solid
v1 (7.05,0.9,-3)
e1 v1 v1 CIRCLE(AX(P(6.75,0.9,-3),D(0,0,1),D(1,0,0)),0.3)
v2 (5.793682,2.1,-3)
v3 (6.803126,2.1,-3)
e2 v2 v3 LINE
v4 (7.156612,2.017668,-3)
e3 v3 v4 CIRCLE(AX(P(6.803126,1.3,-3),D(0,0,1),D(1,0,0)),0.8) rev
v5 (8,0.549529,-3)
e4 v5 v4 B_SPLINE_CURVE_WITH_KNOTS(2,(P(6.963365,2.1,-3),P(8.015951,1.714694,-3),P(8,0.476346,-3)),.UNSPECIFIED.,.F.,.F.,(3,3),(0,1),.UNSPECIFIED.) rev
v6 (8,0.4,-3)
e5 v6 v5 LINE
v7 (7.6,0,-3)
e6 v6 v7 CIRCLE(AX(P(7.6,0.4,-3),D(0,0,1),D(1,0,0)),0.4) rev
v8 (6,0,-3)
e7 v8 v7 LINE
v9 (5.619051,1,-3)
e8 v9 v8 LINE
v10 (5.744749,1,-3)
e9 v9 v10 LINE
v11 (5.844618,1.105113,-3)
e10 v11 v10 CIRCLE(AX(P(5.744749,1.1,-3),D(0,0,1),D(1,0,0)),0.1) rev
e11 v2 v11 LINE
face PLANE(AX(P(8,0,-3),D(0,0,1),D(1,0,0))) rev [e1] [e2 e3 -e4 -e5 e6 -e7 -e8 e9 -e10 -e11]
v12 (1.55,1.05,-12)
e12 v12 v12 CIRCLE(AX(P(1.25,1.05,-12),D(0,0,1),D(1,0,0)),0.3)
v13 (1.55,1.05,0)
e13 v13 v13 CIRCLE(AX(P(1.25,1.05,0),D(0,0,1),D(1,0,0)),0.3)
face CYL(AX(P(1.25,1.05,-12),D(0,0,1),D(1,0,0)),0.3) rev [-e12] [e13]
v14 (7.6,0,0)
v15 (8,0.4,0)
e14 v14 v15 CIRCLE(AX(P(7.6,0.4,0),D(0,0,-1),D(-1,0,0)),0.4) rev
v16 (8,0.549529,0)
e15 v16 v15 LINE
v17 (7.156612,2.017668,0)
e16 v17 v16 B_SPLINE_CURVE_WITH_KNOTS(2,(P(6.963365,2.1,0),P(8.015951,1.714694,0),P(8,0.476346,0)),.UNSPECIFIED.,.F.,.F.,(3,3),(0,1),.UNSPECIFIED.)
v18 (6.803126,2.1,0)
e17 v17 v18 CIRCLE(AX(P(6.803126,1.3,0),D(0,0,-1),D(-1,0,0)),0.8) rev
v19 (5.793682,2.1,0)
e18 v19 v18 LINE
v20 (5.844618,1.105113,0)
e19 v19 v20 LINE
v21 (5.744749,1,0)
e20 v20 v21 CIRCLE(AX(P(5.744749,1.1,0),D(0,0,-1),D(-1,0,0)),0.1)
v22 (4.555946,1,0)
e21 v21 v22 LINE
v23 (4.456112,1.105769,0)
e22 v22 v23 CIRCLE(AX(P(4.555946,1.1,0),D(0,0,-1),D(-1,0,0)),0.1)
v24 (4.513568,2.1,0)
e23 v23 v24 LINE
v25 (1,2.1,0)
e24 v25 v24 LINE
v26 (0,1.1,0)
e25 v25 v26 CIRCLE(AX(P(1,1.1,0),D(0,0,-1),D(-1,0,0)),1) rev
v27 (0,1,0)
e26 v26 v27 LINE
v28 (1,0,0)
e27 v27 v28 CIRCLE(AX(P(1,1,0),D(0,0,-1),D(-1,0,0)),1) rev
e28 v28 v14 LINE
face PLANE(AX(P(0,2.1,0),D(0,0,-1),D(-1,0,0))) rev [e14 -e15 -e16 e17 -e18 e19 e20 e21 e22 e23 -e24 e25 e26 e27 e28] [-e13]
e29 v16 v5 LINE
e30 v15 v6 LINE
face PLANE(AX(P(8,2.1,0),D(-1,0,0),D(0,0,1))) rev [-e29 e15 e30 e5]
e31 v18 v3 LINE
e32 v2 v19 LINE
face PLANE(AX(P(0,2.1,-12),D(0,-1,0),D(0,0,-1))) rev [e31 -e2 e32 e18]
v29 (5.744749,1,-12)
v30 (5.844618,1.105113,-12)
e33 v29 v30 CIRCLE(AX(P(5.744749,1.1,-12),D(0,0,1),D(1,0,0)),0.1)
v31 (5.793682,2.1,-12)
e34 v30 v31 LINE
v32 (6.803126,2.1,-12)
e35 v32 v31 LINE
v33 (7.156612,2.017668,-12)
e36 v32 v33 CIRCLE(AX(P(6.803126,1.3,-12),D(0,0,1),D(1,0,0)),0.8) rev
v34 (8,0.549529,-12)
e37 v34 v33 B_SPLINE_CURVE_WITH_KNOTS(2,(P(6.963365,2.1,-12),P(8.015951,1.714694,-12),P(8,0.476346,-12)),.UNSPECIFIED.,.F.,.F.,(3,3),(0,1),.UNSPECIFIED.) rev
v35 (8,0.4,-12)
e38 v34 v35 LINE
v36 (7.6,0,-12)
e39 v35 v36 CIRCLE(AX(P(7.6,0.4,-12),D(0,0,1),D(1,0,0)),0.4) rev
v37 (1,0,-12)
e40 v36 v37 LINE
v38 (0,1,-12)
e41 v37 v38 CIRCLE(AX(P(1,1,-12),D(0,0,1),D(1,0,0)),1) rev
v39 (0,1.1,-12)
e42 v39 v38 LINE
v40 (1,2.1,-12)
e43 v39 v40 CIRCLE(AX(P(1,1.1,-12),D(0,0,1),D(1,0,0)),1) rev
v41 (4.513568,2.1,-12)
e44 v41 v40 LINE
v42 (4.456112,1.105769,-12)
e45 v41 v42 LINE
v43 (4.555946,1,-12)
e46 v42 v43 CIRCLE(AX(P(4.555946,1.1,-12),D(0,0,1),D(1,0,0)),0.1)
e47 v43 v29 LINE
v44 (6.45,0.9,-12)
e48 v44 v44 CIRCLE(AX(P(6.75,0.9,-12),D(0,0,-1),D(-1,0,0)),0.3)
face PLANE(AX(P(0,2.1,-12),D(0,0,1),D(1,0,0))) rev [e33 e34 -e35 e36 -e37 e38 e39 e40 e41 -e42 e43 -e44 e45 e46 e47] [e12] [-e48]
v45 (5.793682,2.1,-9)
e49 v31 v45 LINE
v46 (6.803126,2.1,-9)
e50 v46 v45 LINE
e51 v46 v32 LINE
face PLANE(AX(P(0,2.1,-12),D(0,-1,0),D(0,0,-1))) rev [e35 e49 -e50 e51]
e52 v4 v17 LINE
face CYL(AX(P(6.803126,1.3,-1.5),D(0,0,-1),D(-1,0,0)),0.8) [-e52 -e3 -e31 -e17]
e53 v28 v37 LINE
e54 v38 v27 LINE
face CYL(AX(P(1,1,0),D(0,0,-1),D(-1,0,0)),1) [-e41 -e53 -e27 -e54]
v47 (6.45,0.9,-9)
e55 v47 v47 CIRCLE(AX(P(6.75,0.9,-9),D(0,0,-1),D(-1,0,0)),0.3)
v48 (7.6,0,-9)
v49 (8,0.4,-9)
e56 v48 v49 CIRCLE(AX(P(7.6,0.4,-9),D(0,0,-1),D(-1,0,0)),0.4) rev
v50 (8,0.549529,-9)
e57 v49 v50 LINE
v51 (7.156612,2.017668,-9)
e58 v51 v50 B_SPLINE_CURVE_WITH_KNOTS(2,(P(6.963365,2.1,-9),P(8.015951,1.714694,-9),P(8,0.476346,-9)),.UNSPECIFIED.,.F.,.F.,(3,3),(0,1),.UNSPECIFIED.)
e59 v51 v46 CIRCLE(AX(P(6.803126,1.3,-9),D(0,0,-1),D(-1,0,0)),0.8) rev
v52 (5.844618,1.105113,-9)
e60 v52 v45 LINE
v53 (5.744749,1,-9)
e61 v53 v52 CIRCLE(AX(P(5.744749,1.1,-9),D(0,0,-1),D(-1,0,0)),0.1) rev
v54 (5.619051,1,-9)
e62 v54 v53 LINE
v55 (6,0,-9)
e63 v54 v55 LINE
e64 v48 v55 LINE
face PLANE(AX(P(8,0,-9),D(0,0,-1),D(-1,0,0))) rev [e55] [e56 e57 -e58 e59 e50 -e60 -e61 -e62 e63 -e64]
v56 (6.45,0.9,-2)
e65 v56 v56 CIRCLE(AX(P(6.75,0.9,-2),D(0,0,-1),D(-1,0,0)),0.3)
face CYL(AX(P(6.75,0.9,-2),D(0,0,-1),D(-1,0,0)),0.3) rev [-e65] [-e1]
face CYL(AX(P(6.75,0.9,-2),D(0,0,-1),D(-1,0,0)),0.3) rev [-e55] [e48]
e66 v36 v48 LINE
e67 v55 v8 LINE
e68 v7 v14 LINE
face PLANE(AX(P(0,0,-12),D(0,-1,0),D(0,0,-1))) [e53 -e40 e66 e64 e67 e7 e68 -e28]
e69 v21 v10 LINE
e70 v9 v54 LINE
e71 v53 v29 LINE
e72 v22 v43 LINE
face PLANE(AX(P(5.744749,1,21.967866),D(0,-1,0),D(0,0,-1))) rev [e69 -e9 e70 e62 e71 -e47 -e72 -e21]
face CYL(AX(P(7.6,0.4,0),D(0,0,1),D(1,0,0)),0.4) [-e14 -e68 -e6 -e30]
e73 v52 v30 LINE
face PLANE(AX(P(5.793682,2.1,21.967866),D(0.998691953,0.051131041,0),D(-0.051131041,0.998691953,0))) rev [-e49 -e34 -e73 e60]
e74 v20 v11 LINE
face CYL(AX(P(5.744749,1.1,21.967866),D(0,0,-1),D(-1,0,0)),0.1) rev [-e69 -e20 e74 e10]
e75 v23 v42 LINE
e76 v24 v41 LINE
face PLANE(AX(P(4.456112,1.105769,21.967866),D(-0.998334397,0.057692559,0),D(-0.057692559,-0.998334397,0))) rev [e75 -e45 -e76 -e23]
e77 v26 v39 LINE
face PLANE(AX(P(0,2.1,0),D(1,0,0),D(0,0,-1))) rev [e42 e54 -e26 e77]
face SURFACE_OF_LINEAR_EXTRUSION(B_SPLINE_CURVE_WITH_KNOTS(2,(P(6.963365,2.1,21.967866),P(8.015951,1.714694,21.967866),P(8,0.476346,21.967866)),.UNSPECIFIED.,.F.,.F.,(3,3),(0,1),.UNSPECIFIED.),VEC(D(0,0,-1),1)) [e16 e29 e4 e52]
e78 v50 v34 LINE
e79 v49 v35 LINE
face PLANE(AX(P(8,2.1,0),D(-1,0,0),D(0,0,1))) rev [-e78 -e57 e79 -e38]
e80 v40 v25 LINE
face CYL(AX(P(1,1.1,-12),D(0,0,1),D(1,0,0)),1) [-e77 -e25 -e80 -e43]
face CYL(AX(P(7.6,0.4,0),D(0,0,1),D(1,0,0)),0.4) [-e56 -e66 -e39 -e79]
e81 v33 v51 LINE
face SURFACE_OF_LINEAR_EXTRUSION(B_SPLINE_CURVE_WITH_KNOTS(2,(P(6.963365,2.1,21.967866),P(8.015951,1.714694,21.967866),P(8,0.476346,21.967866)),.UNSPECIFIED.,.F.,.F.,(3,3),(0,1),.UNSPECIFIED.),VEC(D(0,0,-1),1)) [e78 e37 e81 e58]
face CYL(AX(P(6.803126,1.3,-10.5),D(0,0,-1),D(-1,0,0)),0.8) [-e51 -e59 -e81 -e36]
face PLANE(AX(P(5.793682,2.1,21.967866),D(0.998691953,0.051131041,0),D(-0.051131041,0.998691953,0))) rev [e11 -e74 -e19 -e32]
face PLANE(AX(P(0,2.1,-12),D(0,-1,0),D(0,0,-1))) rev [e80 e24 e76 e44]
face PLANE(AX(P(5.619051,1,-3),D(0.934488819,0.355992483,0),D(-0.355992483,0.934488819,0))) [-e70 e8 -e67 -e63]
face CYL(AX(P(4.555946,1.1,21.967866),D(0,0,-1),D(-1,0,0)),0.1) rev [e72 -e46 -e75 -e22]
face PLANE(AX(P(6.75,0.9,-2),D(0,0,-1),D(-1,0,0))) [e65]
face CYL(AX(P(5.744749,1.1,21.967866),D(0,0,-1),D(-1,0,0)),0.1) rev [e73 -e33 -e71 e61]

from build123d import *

# Parameters (mm, degrees)
SKETCH1_W                = 8
SKETCH1_H                = 12
BOSS_EXTRUDE1_DEPTH      = 2.1
SKETCH2_W                = 2
SKETCH2_H                = 6
CUT_EXTRUDE1_DEPTH       = 2.1
CUT_EXTRUDE4_START       = -12
CUT_EXTRUDE4_DEPTH       = 12
SKETCH4_W                = 6
SKETCH4_H                = 1.1
CUT_EXTRUDE5_DEPTH       = 0.5
CUT_EXTRUDE14_DEPTH      = 6
FILLET1_R                = 1
FILLET2_R                = 0.4
CUT_EXTRUDE15_DEPTH      = 15.574292436
CUT_EXTRUDE15_DEPTH_BACK = 15.574292436
SKETCH8_R                = 0.3
CUT_EXTRUDE16_DEPTH      = 15.574292587
SKETCH9_R                = 0.3
CUT_EXTRUDE17_DEPTH      = 10
FILLET4_R                = 0.8


# Read off the part's stored shape, not the designer's step: Cut-Extrude4
with BuildPart() as part:
    # Sketch1 → Boss-Extrude1 (new body)
    with BuildSketch(Plane(origin=(0, 0, 0), x_dir=(1, 0, 0), z_dir=(0, 1, 0))):
        with Locations((4, 6)):
            Rectangle(SKETCH1_W, SKETCH1_H)
    extrude(amount=BOSS_EXTRUDE1_DEPTH)

    # Sketch2 → Cut-Extrude1 (cut)
    with BuildSketch(Plane(origin=(0, 2.1, 0), x_dir=(1, 0, 0), z_dir=(0, 1, 0))):
        with Locations((7, 6)):
            Rectangle(SKETCH2_W, SKETCH2_H)
    extrude(amount=-CUT_EXTRUDE1_DEPTH, mode=Mode.SUBTRACT)

    # Cut-Extrude4 outline → Cut-Extrude4 (cut)
    with BuildSketch(Plane.XY.offset(CUT_EXTRUDE4_START)):
        with BuildLine():
            ThreePointArc((5.744749223, 1), (5.817245121, 1.031120796), (5.844618418, 1.105113104))
            Line((5.844618418, 1.105113104), (5.793682188, 2.1))
            Line((5.793682188, 2.1), (4.513567693, 2.1))
            Line((4.513567693, 2.1), (4.45611228, 1.105769256))
            ThreePointArc((4.45611228, 1.105769256), (4.483223902, 1.031359362), (4.555945719, 1))
            Line((4.555945719, 1), (5.744749223, 1))
        make_face()
    extrude(amount=CUT_EXTRUDE4_DEPTH, mode=Mode.SUBTRACT)

    # Sketch4 → Cut-Extrude5 (cut)
    with BuildSketch(Plane(origin=(6, 0, 0), x_dir=(0, 0, -1), z_dir=(1, 0, 0))):
        with Locations((6, 1.55)):
            Rectangle(SKETCH4_W, SKETCH4_H)
    extrude(amount=-CUT_EXTRUDE5_DEPTH, mode=Mode.SUBTRACT)

    # Sketch6 → Cut-Extrude14 (cut)
    with BuildSketch(Plane.XY.offset(-9)):
        Polygon((6, 0), (6, 1), (5.619051105, 1), align=None)
    extrude(amount=CUT_EXTRUDE14_DEPTH, mode=Mode.SUBTRACT)

    # Fillet1
    fillet1_edges = [part.edges().sort_by_distance(p)[0] for p in [
        (0, 2.1, -6),
        (0, 0, -6),
    ]]
    fillet(fillet1_edges, radius=FILLET1_R)

    # Fillet2
    fillet2_edges = [part.edges().sort_by_distance(p)[0] for p in [
        (8, 0, -10.5),
        (8, 0, -1.5),
    ]]
    fillet(fillet2_edges, radius=FILLET2_R)

    # Sketch7 → Cut-Extrude15 (cut, two sides: drawn at the far end of the back side and taken through both)
    with BuildSketch(Plane.XY.offset(-CUT_EXTRUDE15_DEPTH_BACK)):
        with BuildLine():
            Line((8, 2.1), (6.963365026, 2.1))
            add(Edge.make_bspline(
                [(6.963365026, 2.1), (7.9845252, 1.726197455), (8, 0.549529298)],
                knots=[0, 0, 0, 0.970144169, 0.970144169, 0.970144169], degree=2))
            Line((8, 0.549529298), (8, 2.1))
        make_face()
    extrude(amount=CUT_EXTRUDE15_DEPTH + CUT_EXTRUDE15_DEPTH_BACK, mode=Mode.SUBTRACT)

    # Sketch8 → Cut-Extrude16 (cut, through all)
    with BuildSketch(Plane.XY):
        with Locations((1.25, 1.05)):
            Circle(SKETCH8_R)
    extrude(amount=-CUT_EXTRUDE16_DEPTH, mode=Mode.SUBTRACT)

    # Sketch9 → Cut-Extrude17 (cut)
    with BuildSketch(Plane(origin=(0, 0, -12), x_dir=(-1, 0, 0), z_dir=(0, 0, -1))):
        with Locations((-6.75, 0.9)):
            Circle(SKETCH9_R)
    extrude(amount=-CUT_EXTRUDE17_DEPTH, mode=Mode.SUBTRACT)

    # Fillet4
    fillet4_edges = [part.edges().sort_by_distance(p)[0] for p in [
        (6.963365026, 2.1, -10.5),
        (6.963365026, 2.1, -1.5),
    ]]
    fillet(fillet4_edges, radius=FILLET4_R)


solid = part.part
